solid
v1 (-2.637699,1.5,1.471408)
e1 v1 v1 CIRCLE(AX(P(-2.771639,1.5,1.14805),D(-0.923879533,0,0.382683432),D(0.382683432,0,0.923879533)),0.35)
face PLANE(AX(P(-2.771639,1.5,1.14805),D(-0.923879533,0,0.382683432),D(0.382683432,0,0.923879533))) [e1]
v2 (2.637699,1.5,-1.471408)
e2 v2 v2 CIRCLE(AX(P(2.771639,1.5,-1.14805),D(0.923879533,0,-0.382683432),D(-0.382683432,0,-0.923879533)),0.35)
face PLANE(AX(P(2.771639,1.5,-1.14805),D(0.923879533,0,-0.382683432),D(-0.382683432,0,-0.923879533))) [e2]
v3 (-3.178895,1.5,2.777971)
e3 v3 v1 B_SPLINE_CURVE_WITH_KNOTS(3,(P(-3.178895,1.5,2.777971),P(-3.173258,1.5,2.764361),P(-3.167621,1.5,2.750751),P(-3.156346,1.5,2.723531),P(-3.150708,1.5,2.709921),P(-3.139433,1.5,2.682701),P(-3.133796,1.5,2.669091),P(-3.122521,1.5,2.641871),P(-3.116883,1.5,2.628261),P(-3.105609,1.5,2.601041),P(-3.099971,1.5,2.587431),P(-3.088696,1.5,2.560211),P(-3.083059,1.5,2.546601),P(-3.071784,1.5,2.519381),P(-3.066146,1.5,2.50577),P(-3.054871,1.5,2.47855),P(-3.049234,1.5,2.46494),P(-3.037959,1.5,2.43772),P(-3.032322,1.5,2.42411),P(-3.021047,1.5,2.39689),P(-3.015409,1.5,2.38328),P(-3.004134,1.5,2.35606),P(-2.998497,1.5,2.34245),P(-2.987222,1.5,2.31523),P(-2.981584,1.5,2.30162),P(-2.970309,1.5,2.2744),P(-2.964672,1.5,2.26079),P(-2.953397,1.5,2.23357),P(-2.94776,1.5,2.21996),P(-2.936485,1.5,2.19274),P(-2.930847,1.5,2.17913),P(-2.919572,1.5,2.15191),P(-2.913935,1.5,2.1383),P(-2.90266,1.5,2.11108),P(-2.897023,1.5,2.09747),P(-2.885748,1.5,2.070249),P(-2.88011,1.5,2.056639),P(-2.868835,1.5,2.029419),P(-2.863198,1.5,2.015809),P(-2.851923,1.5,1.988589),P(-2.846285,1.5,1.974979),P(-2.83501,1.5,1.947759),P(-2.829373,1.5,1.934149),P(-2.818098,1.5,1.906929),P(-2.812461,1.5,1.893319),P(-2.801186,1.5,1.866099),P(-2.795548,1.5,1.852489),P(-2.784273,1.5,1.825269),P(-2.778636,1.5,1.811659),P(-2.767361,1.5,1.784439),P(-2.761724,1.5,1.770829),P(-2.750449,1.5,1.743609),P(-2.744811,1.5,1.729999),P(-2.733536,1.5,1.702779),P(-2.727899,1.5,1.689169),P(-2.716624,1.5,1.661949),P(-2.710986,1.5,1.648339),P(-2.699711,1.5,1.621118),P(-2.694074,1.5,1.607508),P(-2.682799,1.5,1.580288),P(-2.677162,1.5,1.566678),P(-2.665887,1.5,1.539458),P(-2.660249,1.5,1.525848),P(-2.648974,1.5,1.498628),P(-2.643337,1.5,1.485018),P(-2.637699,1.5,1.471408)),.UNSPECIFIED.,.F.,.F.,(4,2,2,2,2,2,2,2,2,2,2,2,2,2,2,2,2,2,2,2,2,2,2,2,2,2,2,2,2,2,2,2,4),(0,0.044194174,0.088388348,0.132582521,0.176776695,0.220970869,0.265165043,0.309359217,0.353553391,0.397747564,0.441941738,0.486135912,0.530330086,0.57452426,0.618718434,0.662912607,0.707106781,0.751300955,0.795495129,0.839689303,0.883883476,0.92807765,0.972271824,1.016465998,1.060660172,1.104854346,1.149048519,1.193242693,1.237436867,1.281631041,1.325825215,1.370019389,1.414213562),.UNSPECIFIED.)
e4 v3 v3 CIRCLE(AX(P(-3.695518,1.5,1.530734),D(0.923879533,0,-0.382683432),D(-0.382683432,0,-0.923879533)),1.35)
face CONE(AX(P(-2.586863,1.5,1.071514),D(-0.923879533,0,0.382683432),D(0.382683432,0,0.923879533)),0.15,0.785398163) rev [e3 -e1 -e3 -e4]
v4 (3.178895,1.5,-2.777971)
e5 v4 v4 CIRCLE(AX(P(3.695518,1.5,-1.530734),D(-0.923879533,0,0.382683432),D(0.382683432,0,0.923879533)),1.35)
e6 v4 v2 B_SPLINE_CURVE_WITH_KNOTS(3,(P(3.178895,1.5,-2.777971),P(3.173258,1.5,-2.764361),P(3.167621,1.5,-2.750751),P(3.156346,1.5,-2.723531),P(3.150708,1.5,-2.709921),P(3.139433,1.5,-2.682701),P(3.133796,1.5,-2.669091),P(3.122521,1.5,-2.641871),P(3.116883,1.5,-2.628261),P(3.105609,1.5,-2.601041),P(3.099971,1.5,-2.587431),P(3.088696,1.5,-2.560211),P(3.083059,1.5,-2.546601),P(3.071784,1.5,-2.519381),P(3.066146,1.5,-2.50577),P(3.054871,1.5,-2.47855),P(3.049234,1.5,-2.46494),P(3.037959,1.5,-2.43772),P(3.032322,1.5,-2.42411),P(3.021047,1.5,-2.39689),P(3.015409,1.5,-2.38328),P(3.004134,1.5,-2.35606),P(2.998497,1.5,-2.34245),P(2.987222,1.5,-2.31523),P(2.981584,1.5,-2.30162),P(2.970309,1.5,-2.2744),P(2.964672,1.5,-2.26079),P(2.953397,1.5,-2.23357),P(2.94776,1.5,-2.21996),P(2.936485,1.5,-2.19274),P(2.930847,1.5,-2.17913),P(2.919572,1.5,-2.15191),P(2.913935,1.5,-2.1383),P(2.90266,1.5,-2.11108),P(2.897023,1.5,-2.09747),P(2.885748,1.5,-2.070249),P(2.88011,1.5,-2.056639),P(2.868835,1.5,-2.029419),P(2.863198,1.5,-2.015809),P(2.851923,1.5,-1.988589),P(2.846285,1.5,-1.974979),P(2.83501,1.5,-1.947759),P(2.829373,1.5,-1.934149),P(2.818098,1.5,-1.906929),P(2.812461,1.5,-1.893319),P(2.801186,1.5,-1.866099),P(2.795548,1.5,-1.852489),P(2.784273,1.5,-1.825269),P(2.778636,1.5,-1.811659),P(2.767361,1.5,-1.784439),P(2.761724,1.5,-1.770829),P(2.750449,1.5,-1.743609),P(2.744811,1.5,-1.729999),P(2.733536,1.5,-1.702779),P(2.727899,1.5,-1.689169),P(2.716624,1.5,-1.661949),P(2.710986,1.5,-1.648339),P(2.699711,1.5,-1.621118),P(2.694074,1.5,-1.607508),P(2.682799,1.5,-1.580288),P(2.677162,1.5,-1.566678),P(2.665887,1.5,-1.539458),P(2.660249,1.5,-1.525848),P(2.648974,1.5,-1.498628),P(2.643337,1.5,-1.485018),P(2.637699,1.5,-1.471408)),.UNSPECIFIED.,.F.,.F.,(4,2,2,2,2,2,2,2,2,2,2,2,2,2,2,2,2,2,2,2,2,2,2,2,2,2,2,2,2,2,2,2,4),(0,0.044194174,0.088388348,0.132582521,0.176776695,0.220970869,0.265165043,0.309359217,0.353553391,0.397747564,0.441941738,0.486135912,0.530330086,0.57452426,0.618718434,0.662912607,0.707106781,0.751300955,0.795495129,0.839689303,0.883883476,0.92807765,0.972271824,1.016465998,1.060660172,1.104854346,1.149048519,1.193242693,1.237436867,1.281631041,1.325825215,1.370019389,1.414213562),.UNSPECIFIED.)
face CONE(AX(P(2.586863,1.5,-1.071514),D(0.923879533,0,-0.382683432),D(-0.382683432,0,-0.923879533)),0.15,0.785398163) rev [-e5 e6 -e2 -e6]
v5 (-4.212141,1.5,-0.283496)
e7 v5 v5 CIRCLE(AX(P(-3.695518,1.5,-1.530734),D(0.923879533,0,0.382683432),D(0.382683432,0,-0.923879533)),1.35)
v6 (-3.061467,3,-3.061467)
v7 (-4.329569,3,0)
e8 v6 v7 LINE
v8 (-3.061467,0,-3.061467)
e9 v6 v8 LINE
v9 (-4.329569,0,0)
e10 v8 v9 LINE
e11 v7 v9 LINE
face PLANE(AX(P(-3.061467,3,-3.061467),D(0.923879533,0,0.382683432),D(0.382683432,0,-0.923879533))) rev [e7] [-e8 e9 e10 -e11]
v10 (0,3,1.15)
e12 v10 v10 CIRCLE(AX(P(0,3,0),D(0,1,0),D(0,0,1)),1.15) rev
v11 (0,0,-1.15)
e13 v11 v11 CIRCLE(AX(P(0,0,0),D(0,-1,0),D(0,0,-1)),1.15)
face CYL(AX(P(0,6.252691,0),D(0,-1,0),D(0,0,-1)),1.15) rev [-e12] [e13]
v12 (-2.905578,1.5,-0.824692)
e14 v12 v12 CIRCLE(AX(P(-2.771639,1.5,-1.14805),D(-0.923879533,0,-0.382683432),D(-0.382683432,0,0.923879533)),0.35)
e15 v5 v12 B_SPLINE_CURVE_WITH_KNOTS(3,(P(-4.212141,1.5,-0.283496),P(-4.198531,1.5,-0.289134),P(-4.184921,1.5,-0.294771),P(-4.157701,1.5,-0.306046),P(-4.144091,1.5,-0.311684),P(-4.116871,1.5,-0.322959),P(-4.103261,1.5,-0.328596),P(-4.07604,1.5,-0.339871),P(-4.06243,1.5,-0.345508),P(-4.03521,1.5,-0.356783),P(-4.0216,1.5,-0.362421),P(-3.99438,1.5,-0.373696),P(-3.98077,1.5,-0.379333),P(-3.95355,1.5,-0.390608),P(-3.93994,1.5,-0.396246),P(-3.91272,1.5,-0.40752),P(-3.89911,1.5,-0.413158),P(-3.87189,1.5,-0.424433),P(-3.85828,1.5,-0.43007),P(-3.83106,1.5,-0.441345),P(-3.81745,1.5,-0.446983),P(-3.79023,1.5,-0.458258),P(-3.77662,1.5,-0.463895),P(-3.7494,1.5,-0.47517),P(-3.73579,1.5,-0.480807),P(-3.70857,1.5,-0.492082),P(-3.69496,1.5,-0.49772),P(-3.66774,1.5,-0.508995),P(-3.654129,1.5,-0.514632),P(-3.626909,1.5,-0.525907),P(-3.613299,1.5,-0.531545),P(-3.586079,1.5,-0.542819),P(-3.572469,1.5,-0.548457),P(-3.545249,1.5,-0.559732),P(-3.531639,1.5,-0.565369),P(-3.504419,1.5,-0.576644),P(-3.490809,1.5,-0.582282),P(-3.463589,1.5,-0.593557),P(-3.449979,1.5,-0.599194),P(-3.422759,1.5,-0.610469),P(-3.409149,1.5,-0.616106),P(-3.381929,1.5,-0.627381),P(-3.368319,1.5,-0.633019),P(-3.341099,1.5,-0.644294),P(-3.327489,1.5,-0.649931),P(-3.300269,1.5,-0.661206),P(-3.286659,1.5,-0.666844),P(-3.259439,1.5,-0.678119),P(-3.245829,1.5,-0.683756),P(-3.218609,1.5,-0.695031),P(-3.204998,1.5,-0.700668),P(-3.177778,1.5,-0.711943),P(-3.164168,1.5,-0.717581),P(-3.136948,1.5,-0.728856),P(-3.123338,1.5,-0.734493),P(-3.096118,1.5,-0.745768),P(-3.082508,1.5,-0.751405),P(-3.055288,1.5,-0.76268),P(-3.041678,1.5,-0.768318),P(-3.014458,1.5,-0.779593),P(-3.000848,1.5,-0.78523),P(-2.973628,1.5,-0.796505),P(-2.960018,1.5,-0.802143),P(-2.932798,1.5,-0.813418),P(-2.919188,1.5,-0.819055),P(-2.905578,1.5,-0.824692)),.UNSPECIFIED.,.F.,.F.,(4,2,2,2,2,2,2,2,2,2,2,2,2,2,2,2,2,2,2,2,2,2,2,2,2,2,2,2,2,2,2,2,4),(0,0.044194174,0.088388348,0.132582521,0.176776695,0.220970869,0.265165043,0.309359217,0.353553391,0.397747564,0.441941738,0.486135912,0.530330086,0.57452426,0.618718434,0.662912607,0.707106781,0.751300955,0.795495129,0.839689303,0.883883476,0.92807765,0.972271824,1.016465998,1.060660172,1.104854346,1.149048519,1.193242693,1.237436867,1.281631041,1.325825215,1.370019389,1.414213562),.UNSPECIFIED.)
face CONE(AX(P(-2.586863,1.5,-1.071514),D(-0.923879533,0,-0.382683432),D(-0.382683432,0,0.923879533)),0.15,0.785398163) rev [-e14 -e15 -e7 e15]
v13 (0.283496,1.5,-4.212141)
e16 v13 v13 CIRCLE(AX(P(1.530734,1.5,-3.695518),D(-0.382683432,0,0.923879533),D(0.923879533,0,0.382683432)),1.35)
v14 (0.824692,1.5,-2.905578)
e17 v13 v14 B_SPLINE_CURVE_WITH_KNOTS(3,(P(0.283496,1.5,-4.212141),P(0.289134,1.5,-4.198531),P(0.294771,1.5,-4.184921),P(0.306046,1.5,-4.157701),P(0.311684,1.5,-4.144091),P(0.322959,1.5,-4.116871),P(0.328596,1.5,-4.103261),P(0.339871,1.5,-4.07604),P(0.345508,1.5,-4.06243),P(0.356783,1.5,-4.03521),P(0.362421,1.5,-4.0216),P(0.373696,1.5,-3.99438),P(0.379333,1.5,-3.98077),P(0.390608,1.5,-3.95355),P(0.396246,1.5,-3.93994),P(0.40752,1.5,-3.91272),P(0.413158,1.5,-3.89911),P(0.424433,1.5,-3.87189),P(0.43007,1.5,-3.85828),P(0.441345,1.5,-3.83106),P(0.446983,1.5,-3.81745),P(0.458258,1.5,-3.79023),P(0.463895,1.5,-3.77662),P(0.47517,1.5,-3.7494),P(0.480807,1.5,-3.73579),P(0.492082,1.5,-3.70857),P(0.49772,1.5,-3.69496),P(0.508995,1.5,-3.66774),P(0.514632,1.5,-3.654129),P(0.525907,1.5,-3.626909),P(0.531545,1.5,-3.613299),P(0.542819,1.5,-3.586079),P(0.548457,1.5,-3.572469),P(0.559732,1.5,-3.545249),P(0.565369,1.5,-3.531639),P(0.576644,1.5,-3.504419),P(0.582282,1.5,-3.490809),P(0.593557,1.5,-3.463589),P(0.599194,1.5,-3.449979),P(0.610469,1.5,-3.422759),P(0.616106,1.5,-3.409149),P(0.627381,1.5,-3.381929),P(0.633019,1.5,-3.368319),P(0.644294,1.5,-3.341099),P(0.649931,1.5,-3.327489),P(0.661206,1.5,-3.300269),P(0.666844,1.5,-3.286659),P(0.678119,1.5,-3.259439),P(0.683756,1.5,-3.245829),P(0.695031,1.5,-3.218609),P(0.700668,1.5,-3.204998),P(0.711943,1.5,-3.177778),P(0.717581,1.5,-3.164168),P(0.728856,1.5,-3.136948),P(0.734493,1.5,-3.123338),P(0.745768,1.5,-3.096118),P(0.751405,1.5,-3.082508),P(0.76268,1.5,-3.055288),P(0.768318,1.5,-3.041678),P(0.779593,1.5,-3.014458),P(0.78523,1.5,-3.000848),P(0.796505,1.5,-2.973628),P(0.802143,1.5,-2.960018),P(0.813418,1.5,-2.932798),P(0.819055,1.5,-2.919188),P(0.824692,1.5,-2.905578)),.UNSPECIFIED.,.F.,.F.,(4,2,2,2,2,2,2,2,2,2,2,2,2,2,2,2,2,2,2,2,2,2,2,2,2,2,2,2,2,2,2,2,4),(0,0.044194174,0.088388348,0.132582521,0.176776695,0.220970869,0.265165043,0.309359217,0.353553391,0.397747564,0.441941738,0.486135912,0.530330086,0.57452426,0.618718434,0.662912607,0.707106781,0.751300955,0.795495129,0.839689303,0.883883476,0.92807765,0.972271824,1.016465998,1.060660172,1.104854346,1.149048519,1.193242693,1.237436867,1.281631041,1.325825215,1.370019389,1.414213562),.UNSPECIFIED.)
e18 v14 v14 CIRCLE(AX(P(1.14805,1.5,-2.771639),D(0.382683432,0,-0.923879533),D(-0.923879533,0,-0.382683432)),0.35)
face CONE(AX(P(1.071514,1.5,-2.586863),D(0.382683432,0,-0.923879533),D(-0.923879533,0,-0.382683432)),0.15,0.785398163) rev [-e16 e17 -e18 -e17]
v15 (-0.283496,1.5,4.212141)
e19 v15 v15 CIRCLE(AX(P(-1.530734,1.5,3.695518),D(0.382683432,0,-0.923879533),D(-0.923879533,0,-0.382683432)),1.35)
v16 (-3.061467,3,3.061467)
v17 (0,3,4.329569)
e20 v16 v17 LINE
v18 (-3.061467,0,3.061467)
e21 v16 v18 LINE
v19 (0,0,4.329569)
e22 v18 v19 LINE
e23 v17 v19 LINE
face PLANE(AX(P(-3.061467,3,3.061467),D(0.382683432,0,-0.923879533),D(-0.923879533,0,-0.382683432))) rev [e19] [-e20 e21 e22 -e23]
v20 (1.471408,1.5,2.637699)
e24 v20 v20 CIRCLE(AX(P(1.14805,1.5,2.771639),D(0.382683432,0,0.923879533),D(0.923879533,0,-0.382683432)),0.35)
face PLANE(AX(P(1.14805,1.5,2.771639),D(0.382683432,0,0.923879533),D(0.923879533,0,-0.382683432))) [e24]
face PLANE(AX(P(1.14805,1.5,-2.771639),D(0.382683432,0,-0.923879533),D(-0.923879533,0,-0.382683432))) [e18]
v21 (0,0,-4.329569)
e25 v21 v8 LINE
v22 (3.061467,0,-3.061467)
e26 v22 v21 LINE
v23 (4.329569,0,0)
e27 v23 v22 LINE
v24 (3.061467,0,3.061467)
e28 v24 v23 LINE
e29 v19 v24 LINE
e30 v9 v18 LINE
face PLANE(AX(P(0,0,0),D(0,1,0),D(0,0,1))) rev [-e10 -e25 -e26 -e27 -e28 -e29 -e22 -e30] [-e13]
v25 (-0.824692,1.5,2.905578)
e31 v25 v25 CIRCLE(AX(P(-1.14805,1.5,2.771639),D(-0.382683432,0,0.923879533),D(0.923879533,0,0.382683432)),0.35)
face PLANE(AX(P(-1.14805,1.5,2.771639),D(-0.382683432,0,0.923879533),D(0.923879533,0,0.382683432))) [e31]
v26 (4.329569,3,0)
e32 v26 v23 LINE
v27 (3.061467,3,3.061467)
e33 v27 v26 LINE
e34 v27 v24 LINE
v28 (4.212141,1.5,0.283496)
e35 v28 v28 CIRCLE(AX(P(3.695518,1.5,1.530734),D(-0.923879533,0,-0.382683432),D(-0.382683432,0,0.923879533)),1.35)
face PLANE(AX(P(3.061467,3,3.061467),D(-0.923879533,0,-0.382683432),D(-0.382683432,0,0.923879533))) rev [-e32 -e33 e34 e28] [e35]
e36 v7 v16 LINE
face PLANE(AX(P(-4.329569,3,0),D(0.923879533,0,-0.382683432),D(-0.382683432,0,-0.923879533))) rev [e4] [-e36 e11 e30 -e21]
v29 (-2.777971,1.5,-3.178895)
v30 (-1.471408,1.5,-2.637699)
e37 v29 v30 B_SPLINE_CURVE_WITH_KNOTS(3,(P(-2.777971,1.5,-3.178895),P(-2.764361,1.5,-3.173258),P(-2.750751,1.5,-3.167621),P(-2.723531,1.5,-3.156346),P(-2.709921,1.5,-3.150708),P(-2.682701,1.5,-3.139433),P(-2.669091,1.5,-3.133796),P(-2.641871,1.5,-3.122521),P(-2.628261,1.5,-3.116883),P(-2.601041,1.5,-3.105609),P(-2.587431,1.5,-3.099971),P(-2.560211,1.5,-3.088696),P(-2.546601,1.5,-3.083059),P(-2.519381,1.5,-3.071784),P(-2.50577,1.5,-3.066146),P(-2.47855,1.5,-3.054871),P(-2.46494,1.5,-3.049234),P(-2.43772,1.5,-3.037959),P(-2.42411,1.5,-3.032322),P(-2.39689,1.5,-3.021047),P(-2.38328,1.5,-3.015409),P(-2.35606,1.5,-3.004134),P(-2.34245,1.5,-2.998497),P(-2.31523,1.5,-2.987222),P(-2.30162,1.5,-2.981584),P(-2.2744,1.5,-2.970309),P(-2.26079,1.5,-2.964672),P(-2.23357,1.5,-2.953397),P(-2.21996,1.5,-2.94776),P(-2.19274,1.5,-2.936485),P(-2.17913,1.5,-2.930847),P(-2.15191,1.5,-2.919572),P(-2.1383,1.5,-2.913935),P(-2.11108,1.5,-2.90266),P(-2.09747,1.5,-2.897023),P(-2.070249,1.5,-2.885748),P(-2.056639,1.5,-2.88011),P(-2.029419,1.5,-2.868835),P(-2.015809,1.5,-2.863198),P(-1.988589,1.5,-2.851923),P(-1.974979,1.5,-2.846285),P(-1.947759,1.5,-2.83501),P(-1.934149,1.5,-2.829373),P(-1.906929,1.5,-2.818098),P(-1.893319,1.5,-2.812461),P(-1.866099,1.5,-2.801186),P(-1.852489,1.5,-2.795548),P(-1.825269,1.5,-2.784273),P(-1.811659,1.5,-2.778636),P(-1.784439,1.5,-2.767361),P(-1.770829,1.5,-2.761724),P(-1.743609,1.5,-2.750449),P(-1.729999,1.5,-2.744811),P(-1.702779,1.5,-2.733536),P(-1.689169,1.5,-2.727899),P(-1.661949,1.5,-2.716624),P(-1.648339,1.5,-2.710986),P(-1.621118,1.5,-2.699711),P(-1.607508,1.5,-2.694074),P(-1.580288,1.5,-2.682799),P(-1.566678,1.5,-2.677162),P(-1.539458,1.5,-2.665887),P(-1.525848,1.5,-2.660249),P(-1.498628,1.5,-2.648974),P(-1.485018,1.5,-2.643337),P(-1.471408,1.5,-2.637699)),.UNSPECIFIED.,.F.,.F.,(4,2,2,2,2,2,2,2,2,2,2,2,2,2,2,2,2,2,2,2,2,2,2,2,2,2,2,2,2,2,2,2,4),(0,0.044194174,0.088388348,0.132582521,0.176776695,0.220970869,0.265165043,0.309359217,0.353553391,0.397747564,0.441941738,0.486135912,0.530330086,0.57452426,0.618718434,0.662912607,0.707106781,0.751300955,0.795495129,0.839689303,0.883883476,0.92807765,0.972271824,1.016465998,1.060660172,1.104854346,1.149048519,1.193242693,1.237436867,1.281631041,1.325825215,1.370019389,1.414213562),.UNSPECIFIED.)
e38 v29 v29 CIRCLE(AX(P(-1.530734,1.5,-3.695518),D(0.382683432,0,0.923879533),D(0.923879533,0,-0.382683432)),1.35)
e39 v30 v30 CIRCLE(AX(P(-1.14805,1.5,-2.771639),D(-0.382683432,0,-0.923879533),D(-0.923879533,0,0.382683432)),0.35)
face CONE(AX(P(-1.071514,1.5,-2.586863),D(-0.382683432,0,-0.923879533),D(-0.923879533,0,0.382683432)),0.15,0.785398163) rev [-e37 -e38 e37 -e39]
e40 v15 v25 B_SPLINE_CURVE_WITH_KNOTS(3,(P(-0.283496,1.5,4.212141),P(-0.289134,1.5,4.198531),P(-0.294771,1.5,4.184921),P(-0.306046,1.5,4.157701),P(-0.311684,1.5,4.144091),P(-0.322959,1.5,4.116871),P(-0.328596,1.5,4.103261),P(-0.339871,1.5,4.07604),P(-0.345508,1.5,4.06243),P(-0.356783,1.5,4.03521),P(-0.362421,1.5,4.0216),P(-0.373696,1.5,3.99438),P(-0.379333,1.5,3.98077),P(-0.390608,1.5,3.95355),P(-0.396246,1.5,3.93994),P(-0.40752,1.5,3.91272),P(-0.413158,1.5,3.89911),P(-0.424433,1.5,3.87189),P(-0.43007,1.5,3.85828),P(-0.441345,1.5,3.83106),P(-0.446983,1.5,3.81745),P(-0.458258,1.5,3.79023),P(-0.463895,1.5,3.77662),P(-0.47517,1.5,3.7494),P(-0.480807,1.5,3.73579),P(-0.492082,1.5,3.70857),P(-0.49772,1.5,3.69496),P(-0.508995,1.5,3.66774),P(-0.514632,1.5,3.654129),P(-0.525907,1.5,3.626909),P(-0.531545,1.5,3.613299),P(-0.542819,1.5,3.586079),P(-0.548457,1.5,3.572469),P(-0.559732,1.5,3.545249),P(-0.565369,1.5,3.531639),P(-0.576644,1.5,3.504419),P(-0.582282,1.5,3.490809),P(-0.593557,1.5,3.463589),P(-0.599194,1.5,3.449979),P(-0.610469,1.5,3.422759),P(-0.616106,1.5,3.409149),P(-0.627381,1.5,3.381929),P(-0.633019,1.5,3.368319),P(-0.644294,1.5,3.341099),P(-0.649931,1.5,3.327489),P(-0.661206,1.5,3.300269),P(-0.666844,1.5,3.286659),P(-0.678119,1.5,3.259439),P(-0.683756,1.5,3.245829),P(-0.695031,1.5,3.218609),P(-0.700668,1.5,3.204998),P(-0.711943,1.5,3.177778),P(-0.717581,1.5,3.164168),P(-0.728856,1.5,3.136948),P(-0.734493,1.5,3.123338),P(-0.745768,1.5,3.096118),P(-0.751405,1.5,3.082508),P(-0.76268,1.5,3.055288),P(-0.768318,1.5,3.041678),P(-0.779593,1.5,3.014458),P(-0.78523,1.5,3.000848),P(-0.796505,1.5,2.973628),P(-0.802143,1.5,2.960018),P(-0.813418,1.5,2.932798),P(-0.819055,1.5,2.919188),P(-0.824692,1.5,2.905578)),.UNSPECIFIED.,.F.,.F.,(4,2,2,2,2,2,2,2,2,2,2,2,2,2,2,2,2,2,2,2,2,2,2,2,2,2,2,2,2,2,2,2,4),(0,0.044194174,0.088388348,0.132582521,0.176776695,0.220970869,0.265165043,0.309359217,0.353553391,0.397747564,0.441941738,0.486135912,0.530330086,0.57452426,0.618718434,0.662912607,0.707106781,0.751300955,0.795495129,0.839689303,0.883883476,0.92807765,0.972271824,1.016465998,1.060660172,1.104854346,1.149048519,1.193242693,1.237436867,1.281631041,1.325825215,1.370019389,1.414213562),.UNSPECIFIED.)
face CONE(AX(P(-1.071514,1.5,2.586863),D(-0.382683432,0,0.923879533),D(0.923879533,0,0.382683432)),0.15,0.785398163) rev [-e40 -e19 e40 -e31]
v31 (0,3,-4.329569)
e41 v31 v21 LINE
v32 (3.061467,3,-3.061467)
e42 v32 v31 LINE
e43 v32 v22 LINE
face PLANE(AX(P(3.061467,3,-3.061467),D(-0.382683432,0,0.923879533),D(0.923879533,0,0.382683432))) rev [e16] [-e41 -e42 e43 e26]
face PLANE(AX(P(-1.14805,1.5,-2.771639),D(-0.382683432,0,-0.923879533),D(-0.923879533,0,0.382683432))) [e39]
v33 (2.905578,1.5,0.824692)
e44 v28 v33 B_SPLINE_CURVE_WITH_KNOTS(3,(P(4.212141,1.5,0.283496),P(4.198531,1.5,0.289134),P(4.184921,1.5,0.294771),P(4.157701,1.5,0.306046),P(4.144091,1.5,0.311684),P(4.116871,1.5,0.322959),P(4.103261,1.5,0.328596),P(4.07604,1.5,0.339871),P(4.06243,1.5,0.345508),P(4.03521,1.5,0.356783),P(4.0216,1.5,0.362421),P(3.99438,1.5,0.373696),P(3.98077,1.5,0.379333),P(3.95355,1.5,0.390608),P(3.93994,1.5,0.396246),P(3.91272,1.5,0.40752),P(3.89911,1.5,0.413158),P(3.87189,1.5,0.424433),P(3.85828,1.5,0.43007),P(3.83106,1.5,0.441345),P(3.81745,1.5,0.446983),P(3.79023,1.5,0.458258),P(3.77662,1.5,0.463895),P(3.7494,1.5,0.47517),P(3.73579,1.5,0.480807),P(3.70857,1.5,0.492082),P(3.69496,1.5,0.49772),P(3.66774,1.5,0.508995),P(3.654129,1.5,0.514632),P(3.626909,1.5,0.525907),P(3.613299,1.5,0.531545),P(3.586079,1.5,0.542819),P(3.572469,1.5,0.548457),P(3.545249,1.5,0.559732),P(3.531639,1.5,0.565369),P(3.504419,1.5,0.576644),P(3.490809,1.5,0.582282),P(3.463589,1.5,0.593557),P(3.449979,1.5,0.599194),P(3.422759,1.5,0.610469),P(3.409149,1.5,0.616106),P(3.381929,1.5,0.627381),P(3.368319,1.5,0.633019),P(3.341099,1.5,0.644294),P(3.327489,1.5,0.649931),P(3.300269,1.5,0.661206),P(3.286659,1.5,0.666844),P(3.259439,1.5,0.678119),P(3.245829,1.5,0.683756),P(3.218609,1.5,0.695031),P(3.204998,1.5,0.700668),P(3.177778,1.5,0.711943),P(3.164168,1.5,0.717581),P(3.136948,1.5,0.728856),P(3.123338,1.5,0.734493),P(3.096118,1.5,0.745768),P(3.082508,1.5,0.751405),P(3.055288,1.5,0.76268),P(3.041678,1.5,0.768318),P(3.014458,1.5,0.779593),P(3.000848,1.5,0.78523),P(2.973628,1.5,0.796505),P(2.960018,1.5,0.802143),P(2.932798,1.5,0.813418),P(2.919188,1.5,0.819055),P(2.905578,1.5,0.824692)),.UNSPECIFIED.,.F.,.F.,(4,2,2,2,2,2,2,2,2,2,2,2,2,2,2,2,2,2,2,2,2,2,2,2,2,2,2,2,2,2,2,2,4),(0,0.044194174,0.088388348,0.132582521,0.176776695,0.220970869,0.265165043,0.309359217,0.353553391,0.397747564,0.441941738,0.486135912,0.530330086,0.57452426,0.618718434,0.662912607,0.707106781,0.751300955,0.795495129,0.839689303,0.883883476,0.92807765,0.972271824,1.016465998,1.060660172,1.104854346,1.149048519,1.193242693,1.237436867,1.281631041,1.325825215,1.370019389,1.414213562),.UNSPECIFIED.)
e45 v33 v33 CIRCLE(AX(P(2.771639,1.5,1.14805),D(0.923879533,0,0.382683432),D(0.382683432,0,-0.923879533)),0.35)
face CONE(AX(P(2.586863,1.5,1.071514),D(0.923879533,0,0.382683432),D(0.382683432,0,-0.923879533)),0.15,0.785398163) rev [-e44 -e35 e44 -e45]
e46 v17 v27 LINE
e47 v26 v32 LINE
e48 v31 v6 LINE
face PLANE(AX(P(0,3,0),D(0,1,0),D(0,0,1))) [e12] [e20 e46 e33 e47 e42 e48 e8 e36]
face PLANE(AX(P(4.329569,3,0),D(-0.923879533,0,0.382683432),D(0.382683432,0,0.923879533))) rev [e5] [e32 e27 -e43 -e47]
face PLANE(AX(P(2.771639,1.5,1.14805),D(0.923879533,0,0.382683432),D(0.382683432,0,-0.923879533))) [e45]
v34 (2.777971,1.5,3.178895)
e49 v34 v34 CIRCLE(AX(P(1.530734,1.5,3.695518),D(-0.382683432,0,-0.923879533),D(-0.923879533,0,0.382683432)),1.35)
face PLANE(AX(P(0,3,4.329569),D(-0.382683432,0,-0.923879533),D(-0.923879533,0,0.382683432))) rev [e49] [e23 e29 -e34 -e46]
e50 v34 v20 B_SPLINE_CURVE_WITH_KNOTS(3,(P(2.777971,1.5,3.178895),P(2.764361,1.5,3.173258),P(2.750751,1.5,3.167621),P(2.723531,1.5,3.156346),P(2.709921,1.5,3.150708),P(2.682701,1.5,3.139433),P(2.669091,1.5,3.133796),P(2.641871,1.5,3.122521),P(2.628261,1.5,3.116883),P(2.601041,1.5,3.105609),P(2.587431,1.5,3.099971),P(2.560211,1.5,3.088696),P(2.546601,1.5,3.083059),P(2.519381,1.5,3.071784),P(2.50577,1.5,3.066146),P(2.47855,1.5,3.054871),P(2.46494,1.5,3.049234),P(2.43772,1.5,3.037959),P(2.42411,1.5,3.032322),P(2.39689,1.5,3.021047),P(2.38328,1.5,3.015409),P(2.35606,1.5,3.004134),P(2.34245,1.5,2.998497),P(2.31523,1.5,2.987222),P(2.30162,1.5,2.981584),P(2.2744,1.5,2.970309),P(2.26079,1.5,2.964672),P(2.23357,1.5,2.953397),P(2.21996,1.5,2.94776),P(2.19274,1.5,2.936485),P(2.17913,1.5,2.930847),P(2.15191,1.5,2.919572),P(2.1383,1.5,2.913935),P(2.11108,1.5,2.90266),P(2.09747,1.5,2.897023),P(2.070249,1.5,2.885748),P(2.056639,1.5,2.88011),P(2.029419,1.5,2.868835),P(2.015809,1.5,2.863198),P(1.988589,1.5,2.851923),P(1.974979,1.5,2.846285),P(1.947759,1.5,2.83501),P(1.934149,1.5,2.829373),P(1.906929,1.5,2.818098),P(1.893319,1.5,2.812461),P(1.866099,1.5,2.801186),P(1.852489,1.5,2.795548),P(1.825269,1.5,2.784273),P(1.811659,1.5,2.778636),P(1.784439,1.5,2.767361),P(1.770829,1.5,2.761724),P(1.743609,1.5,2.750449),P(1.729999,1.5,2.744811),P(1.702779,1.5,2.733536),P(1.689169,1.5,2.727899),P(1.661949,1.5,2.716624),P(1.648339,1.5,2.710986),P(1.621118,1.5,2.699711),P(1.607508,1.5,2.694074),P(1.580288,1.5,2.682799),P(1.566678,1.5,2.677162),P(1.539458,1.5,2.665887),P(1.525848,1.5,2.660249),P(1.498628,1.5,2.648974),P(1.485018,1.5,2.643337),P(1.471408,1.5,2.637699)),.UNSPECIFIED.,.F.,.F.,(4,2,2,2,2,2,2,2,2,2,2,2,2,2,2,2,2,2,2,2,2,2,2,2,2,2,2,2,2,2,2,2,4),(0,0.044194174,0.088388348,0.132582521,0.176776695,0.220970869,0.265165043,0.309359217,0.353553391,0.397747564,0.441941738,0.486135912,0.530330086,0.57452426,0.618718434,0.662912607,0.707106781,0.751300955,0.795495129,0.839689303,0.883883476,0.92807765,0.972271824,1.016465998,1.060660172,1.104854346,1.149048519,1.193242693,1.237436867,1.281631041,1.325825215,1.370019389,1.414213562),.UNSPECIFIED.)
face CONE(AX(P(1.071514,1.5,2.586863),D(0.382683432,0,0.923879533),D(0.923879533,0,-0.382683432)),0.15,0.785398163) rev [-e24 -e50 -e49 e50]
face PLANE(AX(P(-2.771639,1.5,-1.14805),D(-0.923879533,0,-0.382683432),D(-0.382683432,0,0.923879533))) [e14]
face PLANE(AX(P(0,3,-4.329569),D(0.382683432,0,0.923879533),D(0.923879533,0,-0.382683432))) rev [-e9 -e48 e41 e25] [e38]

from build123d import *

# Parameters (mm, degrees)
BOSS_EXTRUDE1_DEPTH = 3
SKETCH2_R           = 1.15
CUT_EXTRUDE1_DEPTH  = 3
SKETCH3_R           = 0.15
CUT_EXTRUDE2_DEPTH  = 1
CHAMFER1_SIZE       = 1.2
CIRPATTERN3_COUNT   = 8
CHAMFER2_SIZE       = 1.2


with BuildPart() as part:
    # Sketch1 → Boss-Extrude1 (new body)
    with BuildSketch(Plane(origin=(0, 0, 0), x_dir=(1, 0, 0), z_dir=(0, 1, 0))):
        Polygon((4.329568801, 0), (3.061467459, 3.061467459), (0, 4.329568801), (-3.061467459, 3.061467459), (-4.329568801, 0), (-3.061467459, -3.061467459), (0, -4.329568801), (3.061467459, -3.061467459), align=None)
    extrude(amount=BOSS_EXTRUDE1_DEPTH)

    # Sketch2 → Cut-Extrude1 (cut)
    with BuildSketch(Plane.XZ):
        with Locations(Location((0, 0, 0), (0, 0, 270))):
            Circle(SKETCH2_R)
    extrude(amount=-CUT_EXTRUDE1_DEPTH, mode=Mode.SUBTRACT)

    # Sketch3 → Cut-Extrude2 (cut)
    with BuildSketch(Plane(origin=(-1.530733729, 0, 3.69551813), x_dir=(0.9238795325112894, 0, 0.3826834323650832), z_dir=(-0.3826834323650833, 0, 0.9238795325112895))):
        with Locations((0, 1.5)):
            Circle(SKETCH3_R)
    cut_extrude2 = extrude(amount=-CUT_EXTRUDE2_DEPTH, mode=Mode.SUBTRACT)

    # Chamfer1
    # the kernel refuses this chamfer: 1.2 mm, written as the material it takes off along each edge
    with BuildSketch(Plane(origin=(-1.530733729, 1.5, 3.69551813), x_dir=(0.9238795325112892, 0, 0.382683432365084), z_dir=(0, -1, 0))) as chamfer1_piece_1_section:
        Polygon((0.15 + CHAMFER1_SIZE, 0), (0.15, -CHAMFER1_SIZE), (0.15, 0), align=None)
    chamfer1_piece_1 = revolve(axis=Axis((-1.530733729, 1.5, 3.69551813), (-0.3826834323650833, 0, 0.9238795325112895)), mode=Mode.PRIVATE)
    chamfer1_piece_1 = split(chamfer1_piece_1, bisect_by=Plane(origin=(-1.939951072, 1.5, 2.443622557), z_dir=(-0.3826834323650833, 0, 0.9238795325112895)), keep=Keep.TOP, mode=Mode.PRIVATE)
    add(chamfer1_piece_1, mode=Mode.SUBTRACT)

    # CirPattern3: Cut-Extrude2 ×8 about axis
    cirpattern3_axis = Axis((0, 0, 0), (0, 1, 0))
    for i in range(1, CIRPATTERN3_COUNT):
        add(cut_extrude2.rotate(cirpattern3_axis, i * 360 / CIRPATTERN3_COUNT), mode=Mode.SUBTRACT)

    # Chamfer2
    # the kernel refuses this chamfer: 1.2 mm, written as the material it takes off along each edge
    with BuildSketch(Plane(origin=(1.530733729, 1.5, 3.69551813), x_dir=(0.9238795325112833, 0, -0.3826834323650982), z_dir=(0, -1, 0))) as chamfer2_piece_1_section:
        Polygon((0.15 + CHAMFER2_SIZE, 0), (0.15, -CHAMFER2_SIZE), (0.15, 0), align=None)
    chamfer2_piece_1 = revolve(axis=Axis((1.530733729, 1.5, 3.69551813), (0.3826834323650963, 0, 0.9238795325112842)), mode=Mode.PRIVATE)
    chamfer2_piece_1 = split(chamfer2_piece_1, bisect_by=Plane(origin=(0.356149522, 1.5, 3.099654638), z_dir=(0.3826834323650963, 0, 0.9238795325112842)), keep=Keep.TOP, mode=Mode.PRIVATE)
    add(chamfer2_piece_1, mode=Mode.SUBTRACT)
    with BuildSketch(Plane(origin=(3.69551813, 1.5, 1.530733729), x_dir=(0.382683432365084, 0, -0.9238795325112892), z_dir=(0, -1, 0))) as chamfer2_piece_2_section:
        Polygon((0.15 + CHAMFER2_SIZE, 0), (0.15, -CHAMFER2_SIZE), (0.15, 0), align=None)
    chamfer2_piece_2 = revolve(axis=Axis((3.69551813, 1.5, 1.530733729), (0.9238795325112895, 0, 0.3826834323650834)), mode=Mode.PRIVATE)
    chamfer2_piece_2 = split(chamfer2_piece_2, bisect_by=Plane(origin=(2.443622557, 1.5, 1.939951072), z_dir=(0.9238795325112895, 0, 0.3826834323650834)), keep=Keep.TOP, mode=Mode.PRIVATE)
    add(chamfer2_piece_2, mode=Mode.SUBTRACT)
    with BuildSketch(Plane(origin=(-3.69551813, 1.5, 1.530733729), x_dir=(0.3826834323650982, 0, 0.9238795325112833), z_dir=(0, -1, 0))) as chamfer2_piece_3_section:
        Polygon((0.15 + CHAMFER2_SIZE, 0), (0.15, -CHAMFER2_SIZE), (0.15, 0), align=None)
    chamfer2_piece_3 = revolve(axis=Axis((-3.69551813, 1.5, 1.530733729), (-0.9238795325112843, 0, 0.3826834323650961)), mode=Mode.PRIVATE)
    chamfer2_piece_3 = split(chamfer2_piece_3, bisect_by=Plane(origin=(-3.099654638, 1.5, 0.356149522), z_dir=(-0.9238795325112843, 0, 0.3826834323650961)), keep=Keep.TOP, mode=Mode.PRIVATE)
    add(chamfer2_piece_3, mode=Mode.SUBTRACT)
    with BuildSketch(Plane(origin=(-3.69551813, 1.5, -1.530733729), x_dir=(-0.382683432365084, 0, 0.9238795325112892), z_dir=(0, -1, 0))) as chamfer2_piece_4_section:
        Polygon((0.15 + CHAMFER2_SIZE, 0), (0.15, -CHAMFER2_SIZE), (0.15, 0), align=None)
    chamfer2_piece_4 = revolve(axis=Axis((-3.69551813, 1.5, -1.530733729), (-0.9238795325112894, 0, -0.3826834323650835)), mode=Mode.PRIVATE)
    chamfer2_piece_4 = split(chamfer2_piece_4, bisect_by=Plane(origin=(-2.443622557, 1.5, -1.939951072), z_dir=(-0.9238795325112894, 0, -0.3826834323650835)), keep=Keep.TOP, mode=Mode.PRIVATE)
    add(chamfer2_piece_4, mode=Mode.SUBTRACT)
    with BuildSketch(Plane(origin=(-1.530733729, 1.5, -3.69551813), x_dir=(-0.9238795325112833, 0, 0.3826834323650982), z_dir=(0, -1, 0))) as chamfer2_piece_5_section:
        Polygon((0.15 + CHAMFER2_SIZE, 0), (0.15, -CHAMFER2_SIZE), (0.15, 0), align=None)
    chamfer2_piece_5 = revolve(axis=Axis((-1.530733729, 1.5, -3.69551813), (-0.3826834323650961, 0, -0.9238795325112841)), mode=Mode.PRIVATE)
    chamfer2_piece_5 = split(chamfer2_piece_5, bisect_by=Plane(origin=(-0.356149522, 1.5, -3.099654638), z_dir=(-0.3826834323650962, 0, -0.9238795325112843)), keep=Keep.TOP, mode=Mode.PRIVATE)
    add(chamfer2_piece_5, mode=Mode.SUBTRACT)
    with BuildSketch(Plane(origin=(1.530733729, 1.5, -3.69551813), x_dir=(-0.9238795325112892, 0, -0.382683432365084), z_dir=(0, -1, 0))) as chamfer2_piece_6_section:
        Polygon((0.15 + CHAMFER2_SIZE, 0), (0.15, -CHAMFER2_SIZE), (0.15, 0), align=None)
    chamfer2_piece_6 = revolve(axis=Axis((1.530733729, 1.5, -3.69551813), (0.3826834323650834, 0, -0.9238795325112895)), mode=Mode.PRIVATE)
    chamfer2_piece_6 = split(chamfer2_piece_6, bisect_by=Plane(origin=(1.939951072, 1.5, -2.443622557), z_dir=(0.3826834323650834, 0, -0.9238795325112895)), keep=Keep.TOP, mode=Mode.PRIVATE)
    add(chamfer2_piece_6, mode=Mode.SUBTRACT)
    with BuildSketch(Plane(origin=(3.69551813, 1.5, -1.530733729), x_dir=(-0.3826834323650982, 0, -0.9238795325112833), z_dir=(0, -1, 0))) as chamfer2_piece_7_section:
        Polygon((0.15 + CHAMFER2_SIZE, 0), (0.15, -CHAMFER2_SIZE), (0.15, 0), align=None)
    chamfer2_piece_7 = revolve(axis=Axis((3.69551813, 1.5, -1.530733729), (0.9238795325112842, 0, -0.3826834323650963)), mode=Mode.PRIVATE)
    chamfer2_piece_7 = split(chamfer2_piece_7, bisect_by=Plane(origin=(3.099654638, 1.5, -0.356149522), z_dir=(0.9238795325112842, 0, -0.3826834323650963)), keep=Keep.TOP, mode=Mode.PRIVATE)
    add(chamfer2_piece_7, mode=Mode.SUBTRACT)


solid = part.part
